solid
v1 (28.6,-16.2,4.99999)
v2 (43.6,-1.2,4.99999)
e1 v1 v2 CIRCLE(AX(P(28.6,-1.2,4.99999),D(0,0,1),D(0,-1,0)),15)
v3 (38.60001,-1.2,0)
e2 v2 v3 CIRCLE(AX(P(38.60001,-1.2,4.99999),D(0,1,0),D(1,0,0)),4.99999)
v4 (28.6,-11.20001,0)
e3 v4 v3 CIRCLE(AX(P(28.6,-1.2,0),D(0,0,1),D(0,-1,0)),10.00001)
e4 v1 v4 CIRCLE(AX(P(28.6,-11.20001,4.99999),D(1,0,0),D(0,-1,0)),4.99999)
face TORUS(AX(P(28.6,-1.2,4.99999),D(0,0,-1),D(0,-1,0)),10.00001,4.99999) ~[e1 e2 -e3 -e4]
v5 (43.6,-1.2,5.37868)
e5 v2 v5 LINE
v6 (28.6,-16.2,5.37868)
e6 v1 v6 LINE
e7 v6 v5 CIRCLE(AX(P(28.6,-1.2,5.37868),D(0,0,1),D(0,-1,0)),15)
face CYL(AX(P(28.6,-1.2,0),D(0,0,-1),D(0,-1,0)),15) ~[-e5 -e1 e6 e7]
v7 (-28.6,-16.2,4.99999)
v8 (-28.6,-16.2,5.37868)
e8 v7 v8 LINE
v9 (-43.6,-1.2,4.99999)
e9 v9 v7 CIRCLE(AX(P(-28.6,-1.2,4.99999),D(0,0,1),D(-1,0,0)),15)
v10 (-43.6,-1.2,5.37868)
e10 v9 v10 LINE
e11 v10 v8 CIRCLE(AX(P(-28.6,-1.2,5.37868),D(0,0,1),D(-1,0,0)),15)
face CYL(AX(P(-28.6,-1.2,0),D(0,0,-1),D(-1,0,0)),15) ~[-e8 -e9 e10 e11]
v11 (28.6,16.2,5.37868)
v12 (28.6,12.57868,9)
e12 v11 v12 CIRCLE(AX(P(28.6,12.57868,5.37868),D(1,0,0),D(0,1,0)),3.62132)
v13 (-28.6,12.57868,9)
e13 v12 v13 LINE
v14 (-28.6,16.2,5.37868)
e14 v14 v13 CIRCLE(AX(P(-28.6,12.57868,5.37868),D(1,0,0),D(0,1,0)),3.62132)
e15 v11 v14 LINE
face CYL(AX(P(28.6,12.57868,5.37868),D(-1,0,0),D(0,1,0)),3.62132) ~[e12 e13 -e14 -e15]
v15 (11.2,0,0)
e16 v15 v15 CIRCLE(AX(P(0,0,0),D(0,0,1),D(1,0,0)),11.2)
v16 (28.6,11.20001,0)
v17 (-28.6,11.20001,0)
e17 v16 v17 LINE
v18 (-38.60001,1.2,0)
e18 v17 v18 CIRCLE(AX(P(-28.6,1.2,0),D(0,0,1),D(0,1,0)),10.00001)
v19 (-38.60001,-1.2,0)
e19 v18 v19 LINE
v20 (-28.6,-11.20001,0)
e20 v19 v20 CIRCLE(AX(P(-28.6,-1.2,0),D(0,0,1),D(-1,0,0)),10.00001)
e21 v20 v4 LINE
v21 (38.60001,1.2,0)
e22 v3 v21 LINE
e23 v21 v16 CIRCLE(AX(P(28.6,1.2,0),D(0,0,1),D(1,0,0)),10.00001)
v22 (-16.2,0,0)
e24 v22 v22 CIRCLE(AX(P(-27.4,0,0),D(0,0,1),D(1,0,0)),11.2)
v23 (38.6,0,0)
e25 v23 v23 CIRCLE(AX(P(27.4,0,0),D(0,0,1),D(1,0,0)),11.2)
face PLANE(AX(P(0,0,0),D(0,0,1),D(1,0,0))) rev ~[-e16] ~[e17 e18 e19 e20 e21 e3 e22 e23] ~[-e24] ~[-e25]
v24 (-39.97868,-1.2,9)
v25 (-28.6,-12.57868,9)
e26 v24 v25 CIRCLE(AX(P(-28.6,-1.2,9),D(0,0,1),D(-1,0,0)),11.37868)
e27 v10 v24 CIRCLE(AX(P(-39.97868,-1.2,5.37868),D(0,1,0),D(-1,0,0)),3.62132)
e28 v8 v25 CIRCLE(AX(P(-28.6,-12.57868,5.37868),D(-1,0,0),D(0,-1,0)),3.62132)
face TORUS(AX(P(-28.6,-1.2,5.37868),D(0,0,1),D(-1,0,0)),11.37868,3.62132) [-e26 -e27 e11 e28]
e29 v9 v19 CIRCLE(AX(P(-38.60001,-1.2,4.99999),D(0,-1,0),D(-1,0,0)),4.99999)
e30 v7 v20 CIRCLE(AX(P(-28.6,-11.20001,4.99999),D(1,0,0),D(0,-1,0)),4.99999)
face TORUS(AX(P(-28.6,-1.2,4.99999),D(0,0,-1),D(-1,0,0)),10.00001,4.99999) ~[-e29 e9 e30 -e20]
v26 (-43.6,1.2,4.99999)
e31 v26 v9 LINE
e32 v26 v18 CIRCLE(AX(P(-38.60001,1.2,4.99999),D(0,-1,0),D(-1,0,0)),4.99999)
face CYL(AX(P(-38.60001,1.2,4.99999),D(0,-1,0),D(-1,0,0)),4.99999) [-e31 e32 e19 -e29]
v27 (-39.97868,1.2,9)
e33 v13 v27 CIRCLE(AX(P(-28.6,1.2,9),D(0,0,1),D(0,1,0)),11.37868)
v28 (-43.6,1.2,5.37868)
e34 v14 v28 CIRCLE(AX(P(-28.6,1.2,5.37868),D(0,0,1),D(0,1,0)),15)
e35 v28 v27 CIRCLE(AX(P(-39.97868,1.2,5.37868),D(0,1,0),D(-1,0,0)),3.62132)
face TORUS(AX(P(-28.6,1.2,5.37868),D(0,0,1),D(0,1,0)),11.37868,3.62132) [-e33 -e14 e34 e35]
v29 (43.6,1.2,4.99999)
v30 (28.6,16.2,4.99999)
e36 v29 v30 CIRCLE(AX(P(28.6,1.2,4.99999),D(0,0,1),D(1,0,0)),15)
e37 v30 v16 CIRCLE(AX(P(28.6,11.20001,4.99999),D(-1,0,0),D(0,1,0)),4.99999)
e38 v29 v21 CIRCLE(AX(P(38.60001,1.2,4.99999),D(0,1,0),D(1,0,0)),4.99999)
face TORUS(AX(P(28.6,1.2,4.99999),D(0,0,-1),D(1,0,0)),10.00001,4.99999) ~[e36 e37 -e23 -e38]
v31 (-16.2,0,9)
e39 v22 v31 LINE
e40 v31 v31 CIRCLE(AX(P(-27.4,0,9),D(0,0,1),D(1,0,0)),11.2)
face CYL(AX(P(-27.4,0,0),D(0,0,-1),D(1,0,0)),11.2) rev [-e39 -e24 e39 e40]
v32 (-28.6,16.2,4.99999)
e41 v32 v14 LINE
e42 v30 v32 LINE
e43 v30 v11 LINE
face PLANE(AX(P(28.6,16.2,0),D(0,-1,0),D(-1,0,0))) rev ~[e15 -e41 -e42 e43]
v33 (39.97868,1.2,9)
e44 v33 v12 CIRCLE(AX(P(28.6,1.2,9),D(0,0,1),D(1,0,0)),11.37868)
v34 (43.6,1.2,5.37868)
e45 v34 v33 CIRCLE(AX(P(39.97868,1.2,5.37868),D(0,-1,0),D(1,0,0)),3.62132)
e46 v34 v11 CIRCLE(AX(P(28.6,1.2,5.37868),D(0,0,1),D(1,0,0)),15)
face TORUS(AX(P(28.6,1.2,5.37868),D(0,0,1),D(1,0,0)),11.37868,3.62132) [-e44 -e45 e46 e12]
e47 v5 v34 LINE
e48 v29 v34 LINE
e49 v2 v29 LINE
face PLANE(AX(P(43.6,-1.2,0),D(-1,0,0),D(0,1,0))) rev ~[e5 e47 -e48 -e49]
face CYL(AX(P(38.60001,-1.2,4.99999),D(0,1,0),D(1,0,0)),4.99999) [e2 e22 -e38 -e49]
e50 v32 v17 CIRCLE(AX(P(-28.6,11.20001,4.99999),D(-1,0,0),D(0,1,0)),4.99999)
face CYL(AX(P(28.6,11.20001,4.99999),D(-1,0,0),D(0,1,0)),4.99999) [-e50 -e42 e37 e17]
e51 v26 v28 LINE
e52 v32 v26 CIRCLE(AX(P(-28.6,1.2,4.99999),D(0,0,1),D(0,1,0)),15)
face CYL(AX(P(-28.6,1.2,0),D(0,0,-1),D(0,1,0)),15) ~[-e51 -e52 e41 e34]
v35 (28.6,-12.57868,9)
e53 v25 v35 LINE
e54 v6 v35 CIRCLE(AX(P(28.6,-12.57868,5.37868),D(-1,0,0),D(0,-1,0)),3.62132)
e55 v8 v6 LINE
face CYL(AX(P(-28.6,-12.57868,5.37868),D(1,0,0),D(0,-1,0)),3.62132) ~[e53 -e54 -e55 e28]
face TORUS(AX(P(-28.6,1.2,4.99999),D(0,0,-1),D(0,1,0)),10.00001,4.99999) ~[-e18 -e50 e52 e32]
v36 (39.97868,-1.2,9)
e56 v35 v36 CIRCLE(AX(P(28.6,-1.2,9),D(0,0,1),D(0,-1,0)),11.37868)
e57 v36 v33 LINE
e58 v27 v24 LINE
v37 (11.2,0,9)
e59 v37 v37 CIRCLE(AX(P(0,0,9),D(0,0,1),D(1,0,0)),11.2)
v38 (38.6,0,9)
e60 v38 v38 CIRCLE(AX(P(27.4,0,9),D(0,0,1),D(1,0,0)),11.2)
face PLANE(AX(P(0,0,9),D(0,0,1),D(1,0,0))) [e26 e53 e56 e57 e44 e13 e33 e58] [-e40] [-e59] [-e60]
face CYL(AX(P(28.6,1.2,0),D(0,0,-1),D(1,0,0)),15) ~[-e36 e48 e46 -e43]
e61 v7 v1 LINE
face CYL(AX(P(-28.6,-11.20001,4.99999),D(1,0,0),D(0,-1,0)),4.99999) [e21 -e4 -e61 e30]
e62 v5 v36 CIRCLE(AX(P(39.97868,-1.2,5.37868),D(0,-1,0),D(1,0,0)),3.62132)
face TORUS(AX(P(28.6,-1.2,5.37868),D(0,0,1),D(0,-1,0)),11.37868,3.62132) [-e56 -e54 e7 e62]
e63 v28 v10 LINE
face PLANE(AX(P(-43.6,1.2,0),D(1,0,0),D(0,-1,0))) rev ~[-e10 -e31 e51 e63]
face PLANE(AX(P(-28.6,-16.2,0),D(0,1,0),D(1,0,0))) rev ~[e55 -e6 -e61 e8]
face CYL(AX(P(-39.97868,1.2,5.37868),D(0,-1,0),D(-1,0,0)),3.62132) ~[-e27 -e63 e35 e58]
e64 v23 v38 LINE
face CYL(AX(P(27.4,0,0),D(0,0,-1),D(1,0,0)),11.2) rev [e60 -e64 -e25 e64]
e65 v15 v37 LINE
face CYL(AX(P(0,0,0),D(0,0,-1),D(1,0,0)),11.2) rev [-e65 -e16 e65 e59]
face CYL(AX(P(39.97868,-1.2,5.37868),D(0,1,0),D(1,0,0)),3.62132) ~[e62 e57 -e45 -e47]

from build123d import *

# Parameters (mm, degrees)
F0_R     = 11.2
F1_DEPTH = 9
F2_R     = 3.6213203436
F3_R     = 4.99999


# Not quite as in the source:
# - a fillet or chamfer is up to 0.001 mm smaller than in the source, because OpenCascade refuses the exact size


with BuildPart() as f1:
    # F0 (on Top) → F1 (new body)
    with BuildSketch(Plane.XY):
        with BuildLine():
            Line((28.6, 16.2), (-28.6, 16.2))
            ThreePointArc((-28.6, 16.2), (-39.2066017178, 11.8066017178), (-43.6, 1.2))
            Line((-43.6, 1.2), (-43.6, -1.2))
            ThreePointArc((-43.6, -1.2), (-39.2066017178, -11.8066017178), (-28.6, -16.2))
            Line((-28.6, -16.2), (28.6, -16.2))
            ThreePointArc((28.6, -16.2), (39.2066017178, -11.8066017178), (43.6, -1.2))
            Line((43.6, -1.2), (43.6, 1.2))
            ThreePointArc((43.6, 1.2), (39.2066017178, 11.8066017178), (28.6, 16.2))
        make_face()
        with Locations((-27.4, 0)):
            Circle(F0_R, mode=Mode.SUBTRACT)
        Circle(F0_R, mode=Mode.SUBTRACT)
        with Locations((27.4, 0)):
            Circle(F0_R, mode=Mode.SUBTRACT)
    extrude(amount=F1_DEPTH)

    # F2
    f2_edges = [f1.edges().sort_by_distance(p)[0] for p in [
        (39.206602, 11.806602, 9),
    ]]
    fillet(f2_edges, radius=F2_R)

    # F3 (radius 5 in the source; OpenCascade refuses exactly that, so slightly less here)
    f3_edges = [f1.edges().sort_by_distance(p)[0] for p in [
        (0, 16.2, 0),
        (39.206602, 11.806602, 0),
    ]]
    fillet(f3_edges, radius=F3_R)


solid = f1.part
